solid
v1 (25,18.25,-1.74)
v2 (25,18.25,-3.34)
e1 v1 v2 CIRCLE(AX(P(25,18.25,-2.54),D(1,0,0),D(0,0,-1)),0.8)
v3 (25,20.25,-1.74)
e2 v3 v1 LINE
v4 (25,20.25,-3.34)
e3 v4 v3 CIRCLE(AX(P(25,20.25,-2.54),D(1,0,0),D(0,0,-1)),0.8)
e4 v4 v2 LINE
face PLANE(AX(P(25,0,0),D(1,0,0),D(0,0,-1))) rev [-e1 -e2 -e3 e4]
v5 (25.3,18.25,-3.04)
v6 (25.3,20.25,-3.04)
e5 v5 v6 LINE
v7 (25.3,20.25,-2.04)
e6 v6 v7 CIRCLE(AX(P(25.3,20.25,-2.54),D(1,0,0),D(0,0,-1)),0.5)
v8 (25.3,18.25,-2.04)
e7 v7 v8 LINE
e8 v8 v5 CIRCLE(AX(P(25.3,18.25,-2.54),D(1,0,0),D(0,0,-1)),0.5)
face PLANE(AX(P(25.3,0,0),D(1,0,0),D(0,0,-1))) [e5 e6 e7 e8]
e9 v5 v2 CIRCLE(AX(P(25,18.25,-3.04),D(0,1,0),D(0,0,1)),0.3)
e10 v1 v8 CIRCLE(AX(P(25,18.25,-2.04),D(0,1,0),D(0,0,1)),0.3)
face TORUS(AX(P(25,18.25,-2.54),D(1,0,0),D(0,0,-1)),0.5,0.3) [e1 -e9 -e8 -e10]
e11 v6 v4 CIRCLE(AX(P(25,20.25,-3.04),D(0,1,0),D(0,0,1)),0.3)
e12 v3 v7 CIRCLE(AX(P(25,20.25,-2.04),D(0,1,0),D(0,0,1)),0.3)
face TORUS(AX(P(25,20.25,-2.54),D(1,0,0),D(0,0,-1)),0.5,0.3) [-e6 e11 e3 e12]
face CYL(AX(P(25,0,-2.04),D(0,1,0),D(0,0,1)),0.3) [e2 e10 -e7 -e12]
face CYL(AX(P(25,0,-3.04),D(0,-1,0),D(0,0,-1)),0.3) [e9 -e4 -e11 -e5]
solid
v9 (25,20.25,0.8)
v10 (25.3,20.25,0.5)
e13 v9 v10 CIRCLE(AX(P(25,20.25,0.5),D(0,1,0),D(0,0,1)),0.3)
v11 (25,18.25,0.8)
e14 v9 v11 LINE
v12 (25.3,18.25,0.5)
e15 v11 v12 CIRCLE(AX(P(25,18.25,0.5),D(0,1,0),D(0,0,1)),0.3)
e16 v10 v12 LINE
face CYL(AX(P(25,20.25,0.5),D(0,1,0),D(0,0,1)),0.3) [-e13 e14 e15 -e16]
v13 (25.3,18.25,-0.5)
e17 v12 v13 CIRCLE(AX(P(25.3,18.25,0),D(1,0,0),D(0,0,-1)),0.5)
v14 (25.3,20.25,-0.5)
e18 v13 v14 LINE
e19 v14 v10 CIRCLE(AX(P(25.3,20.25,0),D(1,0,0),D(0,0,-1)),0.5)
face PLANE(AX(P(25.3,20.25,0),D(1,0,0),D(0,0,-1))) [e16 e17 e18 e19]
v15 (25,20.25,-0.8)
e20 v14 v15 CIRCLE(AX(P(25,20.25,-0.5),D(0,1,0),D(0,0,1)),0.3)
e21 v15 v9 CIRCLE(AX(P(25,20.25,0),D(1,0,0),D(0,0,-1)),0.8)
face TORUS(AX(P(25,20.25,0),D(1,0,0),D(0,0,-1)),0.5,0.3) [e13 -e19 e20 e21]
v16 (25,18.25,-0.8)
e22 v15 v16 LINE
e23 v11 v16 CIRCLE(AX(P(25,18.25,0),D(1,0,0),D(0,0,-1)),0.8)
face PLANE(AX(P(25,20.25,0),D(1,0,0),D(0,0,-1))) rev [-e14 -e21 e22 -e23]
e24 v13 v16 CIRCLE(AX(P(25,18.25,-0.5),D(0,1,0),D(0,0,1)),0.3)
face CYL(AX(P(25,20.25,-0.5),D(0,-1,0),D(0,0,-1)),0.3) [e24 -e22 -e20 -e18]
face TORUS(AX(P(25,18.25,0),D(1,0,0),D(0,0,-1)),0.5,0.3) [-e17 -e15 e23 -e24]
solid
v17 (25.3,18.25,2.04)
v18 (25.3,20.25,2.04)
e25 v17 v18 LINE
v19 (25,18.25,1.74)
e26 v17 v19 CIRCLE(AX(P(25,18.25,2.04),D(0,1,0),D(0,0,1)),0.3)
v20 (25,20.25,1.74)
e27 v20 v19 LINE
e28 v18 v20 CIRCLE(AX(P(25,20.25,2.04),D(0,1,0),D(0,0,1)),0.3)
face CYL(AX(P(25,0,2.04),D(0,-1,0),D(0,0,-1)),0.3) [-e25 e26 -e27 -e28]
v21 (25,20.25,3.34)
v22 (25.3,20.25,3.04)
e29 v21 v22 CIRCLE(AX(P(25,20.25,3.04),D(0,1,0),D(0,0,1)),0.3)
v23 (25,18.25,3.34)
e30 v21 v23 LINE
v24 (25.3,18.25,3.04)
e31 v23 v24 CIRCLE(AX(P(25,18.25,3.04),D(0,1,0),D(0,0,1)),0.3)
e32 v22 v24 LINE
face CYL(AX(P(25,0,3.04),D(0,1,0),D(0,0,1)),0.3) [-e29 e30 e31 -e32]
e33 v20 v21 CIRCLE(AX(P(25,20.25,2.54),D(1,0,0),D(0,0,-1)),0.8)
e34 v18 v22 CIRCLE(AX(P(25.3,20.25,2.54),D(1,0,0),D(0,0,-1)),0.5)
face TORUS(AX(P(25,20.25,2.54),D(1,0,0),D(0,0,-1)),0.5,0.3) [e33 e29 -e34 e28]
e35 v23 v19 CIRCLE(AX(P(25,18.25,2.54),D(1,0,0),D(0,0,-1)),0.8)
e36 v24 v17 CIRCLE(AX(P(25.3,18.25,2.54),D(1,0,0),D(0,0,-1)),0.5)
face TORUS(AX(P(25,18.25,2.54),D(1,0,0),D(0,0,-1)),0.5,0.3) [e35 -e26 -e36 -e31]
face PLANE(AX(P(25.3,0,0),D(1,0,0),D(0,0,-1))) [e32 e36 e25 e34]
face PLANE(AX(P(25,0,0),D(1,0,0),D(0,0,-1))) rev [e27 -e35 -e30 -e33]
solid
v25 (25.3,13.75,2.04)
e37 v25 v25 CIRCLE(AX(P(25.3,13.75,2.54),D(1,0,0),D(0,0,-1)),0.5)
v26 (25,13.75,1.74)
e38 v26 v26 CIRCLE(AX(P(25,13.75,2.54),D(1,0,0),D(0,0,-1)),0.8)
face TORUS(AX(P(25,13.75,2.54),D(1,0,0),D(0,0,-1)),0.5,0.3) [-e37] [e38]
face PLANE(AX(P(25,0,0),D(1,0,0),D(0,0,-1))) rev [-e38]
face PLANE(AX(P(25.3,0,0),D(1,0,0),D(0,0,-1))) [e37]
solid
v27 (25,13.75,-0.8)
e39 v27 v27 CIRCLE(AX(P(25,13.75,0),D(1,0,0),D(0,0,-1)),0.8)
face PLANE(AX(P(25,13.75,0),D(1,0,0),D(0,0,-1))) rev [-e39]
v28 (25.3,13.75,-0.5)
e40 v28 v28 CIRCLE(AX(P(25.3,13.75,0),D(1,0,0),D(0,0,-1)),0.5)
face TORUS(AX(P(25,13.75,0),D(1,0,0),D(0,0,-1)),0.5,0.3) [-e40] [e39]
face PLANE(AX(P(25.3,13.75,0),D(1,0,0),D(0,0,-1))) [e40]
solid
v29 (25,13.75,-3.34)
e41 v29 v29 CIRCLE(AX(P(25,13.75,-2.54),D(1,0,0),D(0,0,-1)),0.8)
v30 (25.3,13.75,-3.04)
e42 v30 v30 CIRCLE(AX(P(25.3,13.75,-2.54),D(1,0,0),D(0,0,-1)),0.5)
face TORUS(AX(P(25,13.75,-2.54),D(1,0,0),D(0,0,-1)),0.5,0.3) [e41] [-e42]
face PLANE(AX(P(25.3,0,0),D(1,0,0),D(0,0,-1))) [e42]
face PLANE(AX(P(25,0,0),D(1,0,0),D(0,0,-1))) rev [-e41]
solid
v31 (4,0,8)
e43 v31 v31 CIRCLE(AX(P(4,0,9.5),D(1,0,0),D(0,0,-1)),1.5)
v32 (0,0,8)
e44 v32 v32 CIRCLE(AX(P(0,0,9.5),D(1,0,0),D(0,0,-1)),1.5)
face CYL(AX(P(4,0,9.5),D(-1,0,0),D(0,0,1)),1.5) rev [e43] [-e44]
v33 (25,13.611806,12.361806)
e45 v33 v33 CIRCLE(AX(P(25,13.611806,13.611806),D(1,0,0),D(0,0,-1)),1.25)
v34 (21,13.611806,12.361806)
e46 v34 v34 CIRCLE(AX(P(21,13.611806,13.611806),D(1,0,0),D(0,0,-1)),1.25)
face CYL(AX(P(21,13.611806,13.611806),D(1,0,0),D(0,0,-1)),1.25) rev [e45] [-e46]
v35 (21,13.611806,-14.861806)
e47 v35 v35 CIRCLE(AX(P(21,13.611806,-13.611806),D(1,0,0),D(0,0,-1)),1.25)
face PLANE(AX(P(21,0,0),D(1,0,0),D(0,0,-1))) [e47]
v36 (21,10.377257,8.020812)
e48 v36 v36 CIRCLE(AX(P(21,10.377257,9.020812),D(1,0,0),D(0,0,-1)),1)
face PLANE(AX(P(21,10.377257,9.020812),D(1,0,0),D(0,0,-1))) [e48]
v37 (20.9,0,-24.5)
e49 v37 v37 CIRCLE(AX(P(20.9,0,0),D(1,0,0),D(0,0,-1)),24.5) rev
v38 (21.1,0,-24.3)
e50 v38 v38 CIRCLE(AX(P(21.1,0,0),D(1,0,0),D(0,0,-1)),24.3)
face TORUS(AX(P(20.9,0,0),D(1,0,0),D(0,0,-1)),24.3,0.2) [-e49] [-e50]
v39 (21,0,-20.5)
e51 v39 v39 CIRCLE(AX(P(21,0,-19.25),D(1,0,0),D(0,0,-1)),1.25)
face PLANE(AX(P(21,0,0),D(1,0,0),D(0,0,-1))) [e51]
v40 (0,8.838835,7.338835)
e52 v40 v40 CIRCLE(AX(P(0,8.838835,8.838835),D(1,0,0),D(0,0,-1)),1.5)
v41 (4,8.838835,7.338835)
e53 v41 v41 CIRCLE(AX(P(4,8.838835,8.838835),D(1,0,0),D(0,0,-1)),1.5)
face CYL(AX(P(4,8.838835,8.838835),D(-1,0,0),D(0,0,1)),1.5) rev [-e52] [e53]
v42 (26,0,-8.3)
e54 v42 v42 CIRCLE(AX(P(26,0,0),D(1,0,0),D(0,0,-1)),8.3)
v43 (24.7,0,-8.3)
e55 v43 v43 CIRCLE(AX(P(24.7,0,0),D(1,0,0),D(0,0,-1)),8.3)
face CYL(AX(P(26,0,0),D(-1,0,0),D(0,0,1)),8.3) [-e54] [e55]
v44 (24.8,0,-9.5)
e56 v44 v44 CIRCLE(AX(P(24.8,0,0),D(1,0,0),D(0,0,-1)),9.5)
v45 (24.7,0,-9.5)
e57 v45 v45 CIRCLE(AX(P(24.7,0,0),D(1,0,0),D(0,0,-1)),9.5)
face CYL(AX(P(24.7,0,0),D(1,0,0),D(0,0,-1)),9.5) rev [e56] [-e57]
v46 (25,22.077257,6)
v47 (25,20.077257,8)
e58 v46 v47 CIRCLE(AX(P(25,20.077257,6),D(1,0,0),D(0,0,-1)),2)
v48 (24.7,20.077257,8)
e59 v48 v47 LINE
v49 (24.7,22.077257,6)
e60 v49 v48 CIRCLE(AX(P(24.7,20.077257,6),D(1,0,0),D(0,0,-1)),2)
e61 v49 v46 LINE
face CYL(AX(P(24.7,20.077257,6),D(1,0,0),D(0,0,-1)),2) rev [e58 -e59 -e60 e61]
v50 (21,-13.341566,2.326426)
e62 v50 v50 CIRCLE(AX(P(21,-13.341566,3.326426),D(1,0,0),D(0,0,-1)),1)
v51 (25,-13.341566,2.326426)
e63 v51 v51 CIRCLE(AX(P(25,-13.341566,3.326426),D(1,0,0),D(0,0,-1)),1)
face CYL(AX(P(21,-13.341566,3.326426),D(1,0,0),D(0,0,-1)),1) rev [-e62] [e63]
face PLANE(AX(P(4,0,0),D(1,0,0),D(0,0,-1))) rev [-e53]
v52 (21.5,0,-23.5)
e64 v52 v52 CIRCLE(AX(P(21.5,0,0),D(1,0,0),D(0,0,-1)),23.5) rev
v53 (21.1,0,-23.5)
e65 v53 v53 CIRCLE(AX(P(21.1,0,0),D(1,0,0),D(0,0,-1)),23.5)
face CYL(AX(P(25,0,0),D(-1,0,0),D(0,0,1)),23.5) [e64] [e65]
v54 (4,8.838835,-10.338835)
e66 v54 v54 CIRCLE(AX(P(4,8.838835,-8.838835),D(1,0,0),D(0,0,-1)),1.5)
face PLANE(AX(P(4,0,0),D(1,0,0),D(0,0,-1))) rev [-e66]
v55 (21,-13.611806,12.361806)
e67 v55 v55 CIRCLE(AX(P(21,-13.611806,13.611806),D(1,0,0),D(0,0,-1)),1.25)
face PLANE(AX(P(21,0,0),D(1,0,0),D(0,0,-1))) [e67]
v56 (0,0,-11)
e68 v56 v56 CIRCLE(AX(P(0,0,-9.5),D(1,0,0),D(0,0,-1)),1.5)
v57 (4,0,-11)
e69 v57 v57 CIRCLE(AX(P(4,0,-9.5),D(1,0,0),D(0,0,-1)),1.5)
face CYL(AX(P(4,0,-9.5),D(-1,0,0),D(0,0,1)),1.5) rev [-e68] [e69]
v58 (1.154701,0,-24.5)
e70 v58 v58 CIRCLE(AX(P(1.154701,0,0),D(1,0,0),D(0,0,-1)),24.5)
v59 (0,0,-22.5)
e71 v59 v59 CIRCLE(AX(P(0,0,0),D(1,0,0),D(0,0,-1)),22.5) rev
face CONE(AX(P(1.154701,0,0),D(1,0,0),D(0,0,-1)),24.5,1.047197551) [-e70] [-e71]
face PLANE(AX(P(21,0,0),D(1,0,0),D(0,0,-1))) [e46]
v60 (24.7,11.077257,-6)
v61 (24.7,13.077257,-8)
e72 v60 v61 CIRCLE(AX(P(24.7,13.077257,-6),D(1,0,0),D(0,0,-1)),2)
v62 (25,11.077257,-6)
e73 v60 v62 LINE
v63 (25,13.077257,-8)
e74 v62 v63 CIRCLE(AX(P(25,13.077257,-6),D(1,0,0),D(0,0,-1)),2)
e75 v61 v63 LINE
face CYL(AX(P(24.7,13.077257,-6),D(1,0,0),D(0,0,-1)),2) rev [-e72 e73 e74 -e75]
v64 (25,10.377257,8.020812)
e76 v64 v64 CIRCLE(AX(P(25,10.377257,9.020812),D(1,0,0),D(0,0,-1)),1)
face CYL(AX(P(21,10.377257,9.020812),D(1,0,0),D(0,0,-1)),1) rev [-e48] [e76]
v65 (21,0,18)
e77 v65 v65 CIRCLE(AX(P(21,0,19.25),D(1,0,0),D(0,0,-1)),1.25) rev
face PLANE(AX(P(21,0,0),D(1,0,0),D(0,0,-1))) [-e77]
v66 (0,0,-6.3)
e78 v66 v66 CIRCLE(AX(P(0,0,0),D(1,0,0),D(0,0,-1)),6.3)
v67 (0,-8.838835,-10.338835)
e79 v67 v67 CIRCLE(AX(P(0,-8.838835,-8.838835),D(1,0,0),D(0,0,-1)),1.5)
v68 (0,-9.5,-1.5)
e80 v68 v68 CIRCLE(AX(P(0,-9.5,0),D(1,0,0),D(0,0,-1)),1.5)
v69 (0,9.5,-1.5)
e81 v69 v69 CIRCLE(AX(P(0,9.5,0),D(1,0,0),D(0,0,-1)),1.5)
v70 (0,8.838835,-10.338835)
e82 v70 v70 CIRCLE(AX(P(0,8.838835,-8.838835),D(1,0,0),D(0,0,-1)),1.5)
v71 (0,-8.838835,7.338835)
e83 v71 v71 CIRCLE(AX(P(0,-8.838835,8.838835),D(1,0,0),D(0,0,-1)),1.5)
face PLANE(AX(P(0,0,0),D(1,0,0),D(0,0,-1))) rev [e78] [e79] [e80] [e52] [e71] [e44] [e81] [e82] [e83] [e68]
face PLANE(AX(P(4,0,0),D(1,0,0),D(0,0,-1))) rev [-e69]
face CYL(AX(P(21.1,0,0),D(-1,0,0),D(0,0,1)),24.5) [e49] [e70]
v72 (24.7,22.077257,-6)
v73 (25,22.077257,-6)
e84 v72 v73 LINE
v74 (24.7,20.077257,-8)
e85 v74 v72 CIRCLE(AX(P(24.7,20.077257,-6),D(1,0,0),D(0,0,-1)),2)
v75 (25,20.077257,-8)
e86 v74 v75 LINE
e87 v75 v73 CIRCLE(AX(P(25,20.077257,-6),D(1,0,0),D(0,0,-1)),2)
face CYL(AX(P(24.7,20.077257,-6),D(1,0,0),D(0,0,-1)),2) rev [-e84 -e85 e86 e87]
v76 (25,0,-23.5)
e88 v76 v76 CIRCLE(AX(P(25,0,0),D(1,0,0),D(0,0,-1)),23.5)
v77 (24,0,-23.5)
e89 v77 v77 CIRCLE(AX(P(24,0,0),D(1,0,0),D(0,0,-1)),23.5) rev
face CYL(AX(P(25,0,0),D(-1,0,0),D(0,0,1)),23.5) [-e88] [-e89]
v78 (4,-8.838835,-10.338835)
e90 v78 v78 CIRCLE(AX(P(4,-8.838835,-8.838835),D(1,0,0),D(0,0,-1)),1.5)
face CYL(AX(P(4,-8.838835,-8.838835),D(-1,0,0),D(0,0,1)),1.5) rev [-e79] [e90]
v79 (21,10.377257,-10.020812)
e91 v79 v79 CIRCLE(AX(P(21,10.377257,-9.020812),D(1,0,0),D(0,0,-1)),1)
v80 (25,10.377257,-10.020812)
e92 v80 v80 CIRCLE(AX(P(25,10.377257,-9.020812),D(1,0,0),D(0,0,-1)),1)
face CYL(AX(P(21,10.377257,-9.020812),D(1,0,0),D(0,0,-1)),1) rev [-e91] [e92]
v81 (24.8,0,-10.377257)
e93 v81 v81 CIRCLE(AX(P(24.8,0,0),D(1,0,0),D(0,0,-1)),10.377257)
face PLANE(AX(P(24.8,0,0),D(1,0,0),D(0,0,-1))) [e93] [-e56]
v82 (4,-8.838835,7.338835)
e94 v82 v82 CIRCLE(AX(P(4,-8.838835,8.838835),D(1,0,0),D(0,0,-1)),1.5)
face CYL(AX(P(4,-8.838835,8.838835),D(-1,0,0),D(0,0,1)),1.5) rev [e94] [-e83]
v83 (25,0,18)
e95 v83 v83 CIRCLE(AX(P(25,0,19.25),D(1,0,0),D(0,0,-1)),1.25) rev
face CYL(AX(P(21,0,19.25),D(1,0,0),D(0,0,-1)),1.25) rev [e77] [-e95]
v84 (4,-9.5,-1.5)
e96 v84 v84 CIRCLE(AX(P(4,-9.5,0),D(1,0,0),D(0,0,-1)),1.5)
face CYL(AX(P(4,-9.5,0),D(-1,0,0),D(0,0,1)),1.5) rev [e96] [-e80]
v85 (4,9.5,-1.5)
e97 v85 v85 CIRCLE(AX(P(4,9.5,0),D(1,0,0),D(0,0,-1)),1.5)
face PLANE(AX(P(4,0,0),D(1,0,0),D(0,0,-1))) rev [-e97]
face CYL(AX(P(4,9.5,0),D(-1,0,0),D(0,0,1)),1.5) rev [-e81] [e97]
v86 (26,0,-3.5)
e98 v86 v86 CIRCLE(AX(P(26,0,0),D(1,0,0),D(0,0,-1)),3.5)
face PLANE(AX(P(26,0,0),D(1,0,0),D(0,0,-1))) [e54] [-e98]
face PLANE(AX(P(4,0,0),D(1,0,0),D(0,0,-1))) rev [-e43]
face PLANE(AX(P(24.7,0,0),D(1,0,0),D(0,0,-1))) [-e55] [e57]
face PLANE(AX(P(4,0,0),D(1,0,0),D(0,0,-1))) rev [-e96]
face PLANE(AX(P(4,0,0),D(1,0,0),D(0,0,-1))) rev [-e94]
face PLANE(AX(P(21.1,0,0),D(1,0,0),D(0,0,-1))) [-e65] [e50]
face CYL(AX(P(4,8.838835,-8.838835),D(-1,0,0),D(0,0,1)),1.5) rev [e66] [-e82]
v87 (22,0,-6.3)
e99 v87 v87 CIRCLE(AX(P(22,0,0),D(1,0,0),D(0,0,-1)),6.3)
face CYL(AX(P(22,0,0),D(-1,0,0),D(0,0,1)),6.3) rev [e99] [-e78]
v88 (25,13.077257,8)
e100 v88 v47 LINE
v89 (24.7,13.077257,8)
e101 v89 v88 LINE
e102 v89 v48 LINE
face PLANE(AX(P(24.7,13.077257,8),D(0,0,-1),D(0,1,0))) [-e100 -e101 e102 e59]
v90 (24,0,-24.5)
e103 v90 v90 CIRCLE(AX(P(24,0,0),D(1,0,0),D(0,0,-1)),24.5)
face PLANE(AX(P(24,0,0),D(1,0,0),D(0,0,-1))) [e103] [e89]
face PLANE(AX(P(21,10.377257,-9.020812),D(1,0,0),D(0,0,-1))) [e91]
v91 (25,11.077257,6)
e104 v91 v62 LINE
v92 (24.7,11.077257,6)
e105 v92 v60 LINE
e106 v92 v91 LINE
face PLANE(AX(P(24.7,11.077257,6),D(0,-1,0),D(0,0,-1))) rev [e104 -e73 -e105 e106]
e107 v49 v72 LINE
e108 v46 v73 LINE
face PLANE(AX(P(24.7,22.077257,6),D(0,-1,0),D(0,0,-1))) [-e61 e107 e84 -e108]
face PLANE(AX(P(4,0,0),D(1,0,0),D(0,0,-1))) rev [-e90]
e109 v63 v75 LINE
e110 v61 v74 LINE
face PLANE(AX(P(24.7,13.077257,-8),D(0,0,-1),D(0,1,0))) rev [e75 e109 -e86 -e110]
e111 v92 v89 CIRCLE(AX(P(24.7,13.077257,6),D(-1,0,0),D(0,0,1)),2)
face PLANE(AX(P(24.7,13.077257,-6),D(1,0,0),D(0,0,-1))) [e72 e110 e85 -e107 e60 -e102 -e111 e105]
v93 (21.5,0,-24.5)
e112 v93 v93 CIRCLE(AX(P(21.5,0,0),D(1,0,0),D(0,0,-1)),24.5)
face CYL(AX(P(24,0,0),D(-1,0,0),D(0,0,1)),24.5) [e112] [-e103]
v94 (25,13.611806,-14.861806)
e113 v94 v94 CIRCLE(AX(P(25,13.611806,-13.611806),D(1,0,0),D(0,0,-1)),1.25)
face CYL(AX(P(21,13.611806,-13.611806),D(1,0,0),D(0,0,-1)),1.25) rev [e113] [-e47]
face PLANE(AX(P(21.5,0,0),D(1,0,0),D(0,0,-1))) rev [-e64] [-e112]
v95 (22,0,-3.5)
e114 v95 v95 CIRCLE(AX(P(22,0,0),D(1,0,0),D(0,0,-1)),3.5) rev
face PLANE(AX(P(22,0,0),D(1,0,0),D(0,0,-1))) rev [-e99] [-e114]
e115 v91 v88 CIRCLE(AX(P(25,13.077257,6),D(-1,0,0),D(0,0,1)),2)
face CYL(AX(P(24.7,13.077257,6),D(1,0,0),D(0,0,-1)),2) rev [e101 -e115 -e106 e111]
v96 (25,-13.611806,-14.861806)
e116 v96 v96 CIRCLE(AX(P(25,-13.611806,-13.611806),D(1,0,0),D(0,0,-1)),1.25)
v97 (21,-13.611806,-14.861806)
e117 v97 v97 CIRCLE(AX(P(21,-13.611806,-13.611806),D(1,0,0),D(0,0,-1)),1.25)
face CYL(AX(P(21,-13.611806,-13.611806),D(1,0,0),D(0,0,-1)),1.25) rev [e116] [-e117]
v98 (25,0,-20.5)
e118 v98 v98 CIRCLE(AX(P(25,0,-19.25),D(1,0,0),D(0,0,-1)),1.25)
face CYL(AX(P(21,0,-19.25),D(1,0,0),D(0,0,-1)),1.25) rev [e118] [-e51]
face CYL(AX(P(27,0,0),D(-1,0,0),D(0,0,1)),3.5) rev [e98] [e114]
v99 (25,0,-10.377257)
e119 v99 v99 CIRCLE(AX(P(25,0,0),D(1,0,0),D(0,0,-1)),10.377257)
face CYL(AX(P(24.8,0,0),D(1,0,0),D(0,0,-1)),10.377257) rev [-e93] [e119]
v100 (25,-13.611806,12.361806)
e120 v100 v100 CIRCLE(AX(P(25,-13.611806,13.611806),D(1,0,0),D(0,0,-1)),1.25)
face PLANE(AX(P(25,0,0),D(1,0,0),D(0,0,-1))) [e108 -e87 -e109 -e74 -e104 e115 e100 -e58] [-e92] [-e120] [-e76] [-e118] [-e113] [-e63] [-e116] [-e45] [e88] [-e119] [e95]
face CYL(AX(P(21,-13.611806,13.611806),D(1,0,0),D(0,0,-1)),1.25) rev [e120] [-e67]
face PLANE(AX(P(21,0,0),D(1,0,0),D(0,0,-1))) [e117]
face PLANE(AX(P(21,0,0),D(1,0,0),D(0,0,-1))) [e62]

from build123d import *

# Parameters (mm, degrees)
SKETCH_2_R           = 24.5
EXTRUDE_1_DEPTH      = 24
SKETCH_2_17_R        = 24.5
CUT_EXTRUDE_18_DEPTH = 21.5
SKETCH_2_18_R        = 24.5
EXTRUDE_7_DEPTH      = 21.1
SKETCH_2_5_R         = 23.5
EXTRUDE_2_DEPTH      = 25
SKETCH_2_14_R        = 1.5
CUT_EXTRUDE_12_DEPTH = 4
CHAMFER_1_SIZE       = 2
CHAMFER_1_SIZE2      = 1.154700538
SKETCH_2_15_R        = 6.3
SKETCH_2_15_R_2      = 3.5
CUT_EXTRUDE_13_DEPTH = 22
SKETCH_2_16_R        = 3.5
CUT_EXTRUDE_16_DEPTH = 27
SKETCH_3_R           = 8.3
SKETCH_3_R_2         = 3.5
EXTRUDE_6_DEPTH      = 1
SKETCH_3_7_R         = 1.25
SKETCH_3_7_R_2       = 1
CUT_EXTRUDE_17_DEPTH = 4
CUT_EXTRUDE_START    = -0.3
SKETCH_3_8_R         = 9.5
SKETCH_3_8_R_2       = 8.3
CUT_EXTRUDE_19_DEPTH = 0.3
CUT_EXTRUDE_START_2  = -0.2
SKETCH_3_9_R         = 10.377256728
SKETCH_3_9_R_2       = 9.5
CUT_EXTRUDE_20_DEPTH = 0.2
CUT_EXTRUDE_21_DEPTH = 0.3
EXTRUDE_8_DEPTH      = 0.3
EXTRUDE_8_2_DEPTH    = 0.3
EXTRUDE_8_3_DEPTH    = 0.3
FILLET_1_R           = 0.3
FILLET_2_R           = 0.3
FILLET_3_R           = 0.3
SKETCH_3_13_R        = 0.8
EXTRUDE_9_DEPTH      = 0.3
EXTRUDE_9_2_DEPTH    = 0.3
EXTRUDE_9_3_DEPTH    = 0.3
FILLET_4_R           = 0.3
FILLET_5_R           = 0.3
FILLET_6_R           = 0.3
FILLET_7_R           = 0.2


# Some blends are built 0.0001 mm under size
with BuildPart() as part:
    # 草图2 → 凸台-拉伸1 (new body)
    with BuildSketch(Plane(origin=(0, 0, 0), x_dir=(0, 0, -1), z_dir=(1, 0, 0))):
        Circle(SKETCH_2_R)
    extrude(amount=EXTRUDE_1_DEPTH)

    # 草图2<17> → 切除-拉伸18 (cut)
    with BuildSketch(Plane(origin=(0, 0, 0), x_dir=(0, 0, -1), z_dir=(1, 0, 0))):
        Circle(SKETCH_2_17_R)
    extrude(amount=CUT_EXTRUDE_18_DEPTH, mode=Mode.SUBTRACT)



with BuildPart() as body_2:
    # 草图2<18> → 凸台-拉伸7 (new body)
    with BuildSketch(Plane(origin=(0, 0, 0), x_dir=(0, 0, -1), z_dir=(1, 0, 0))):
        Circle(SKETCH_2_18_R)
    extrude(amount=EXTRUDE_7_DEPTH)


with BuildPart() as part_1:
    add(part.part)

    add(body_2.part)  # 凸台-拉伸2 merges body 2
    # 草图2<5> → 凸台-拉伸2 (add)
    with BuildSketch(Plane(origin=(0, 0, 0), x_dir=(0, 0, -1), z_dir=(1, 0, 0))):
        Circle(SKETCH_2_5_R)
    extrude(amount=EXTRUDE_2_DEPTH)

    # 草图2<14> → 切除-拉伸12 (cut)
    with BuildSketch(Plane(origin=(0, 0, 0), x_dir=(0, 0, -1), z_dir=(1, 0, 0))):
        with Locations((0, 9.5)):
            Circle(SKETCH_2_14_R)
        with Locations((9.5, 0)):
            Circle(SKETCH_2_14_R)
        with Locations((0, -9.5)):
            Circle(SKETCH_2_14_R)
        with Locations((-9.5, 0)):
            Circle(SKETCH_2_14_R)
        with Locations((8.838834765, 8.838834765)):
            Circle(SKETCH_2_14_R)
        with Locations((8.838834765, -8.838834765)):
            Circle(SKETCH_2_14_R)
        with Locations((-8.838834765, -8.838834765)):
            Circle(SKETCH_2_14_R)
        with Locations((-8.838834765, 8.838834765)):
            Circle(SKETCH_2_14_R)
    extrude(amount=CUT_EXTRUDE_12_DEPTH, mode=Mode.SUBTRACT)

    # 倒角1
    chamfer_1_edges = [part_1.edges().sort_by_distance(p)[0] for p in [
        (0, 0, 24.5),
    ]]
    chamfer_1_side = [part_1.faces().sort_by_distance(p)[0] for p in [
        (0, 0, 0),
    ]]
    chamfer(chamfer_1_edges, length=CHAMFER_1_SIZE, length2=CHAMFER_1_SIZE2, reference=chamfer_1_side[0])

    # 草图2<15> → 切除-拉伸13 (cut)
    with BuildSketch(Plane(origin=(0, 0, 0), x_dir=(0, 0, -1), z_dir=(1, 0, 0))):
        Circle(SKETCH_2_15_R)
        Circle(SKETCH_2_15_R_2, mode=Mode.SUBTRACT)
    extrude(amount=CUT_EXTRUDE_13_DEPTH, mode=Mode.SUBTRACT)

    # 草图2<16> → 切除-拉伸16 (cut)
    with BuildSketch(Plane(origin=(0, 0, 0), x_dir=(0, 0, -1), z_dir=(1, 0, 0))):
        Circle(SKETCH_2_16_R)
    extrude(amount=CUT_EXTRUDE_16_DEPTH, mode=Mode.SUBTRACT)

    # 草图3 → 凸台-拉伸6 (add)
    with BuildSketch(Plane(origin=(25, 0, 0), x_dir=(0, 0, -1), z_dir=(1, 0, 0))):
        Circle(SKETCH_3_R)
        Circle(SKETCH_3_R_2, mode=Mode.SUBTRACT)
    extrude(amount=EXTRUDE_6_DEPTH)

    # 草图3<7> → 切除-拉伸17 (cut)
    with BuildSketch(Plane(origin=(25, 0, 0), x_dir=(0, 0, -1), z_dir=(1, 0, 0))):
        with Locations((13.611805538, 13.611805538)):
            Circle(SKETCH_3_7_R)
        with Locations((13.611805538, -13.611805538)):
            Circle(SKETCH_3_7_R)
        with Locations((-3.326426064, -13.341566236)):
            Circle(SKETCH_3_7_R_2)
        with Locations((-13.611805538, -13.611805538)):
            Circle(SKETCH_3_7_R)
        with Locations((-13.611805538, 13.611805538)):
            Circle(SKETCH_3_7_R)
        with Locations((-19.25, 0)):
            Circle(SKETCH_3_7_R)
        with Locations((19.25, 0)):
            Circle(SKETCH_3_7_R)
        with Locations((9.020811649, 10.377256728)):
            Circle(SKETCH_3_7_R_2)
        with Locations((-9.020811649, 10.377256728)):
            Circle(SKETCH_3_7_R_2)
    extrude(amount=-CUT_EXTRUDE_17_DEPTH, mode=Mode.SUBTRACT)

    # 草图3<8> → 切除-拉伸19 (cut)
    with BuildSketch(Plane(origin=(25, 0, 0), x_dir=(0, 0, -1), z_dir=(1, 0, 0)).offset(CUT_EXTRUDE_START)):
        Circle(SKETCH_3_8_R)
        Circle(SKETCH_3_8_R_2, mode=Mode.SUBTRACT)
    extrude(amount=CUT_EXTRUDE_19_DEPTH, mode=Mode.SUBTRACT)

    # 草图3<9> → 切除-拉伸20 (cut)
    with BuildSketch(Plane(origin=(25, 0, 0), x_dir=(0, 0, -1), z_dir=(1, 0, 0)).offset(CUT_EXTRUDE_START_2)):
        Circle(SKETCH_3_9_R)
        Circle(SKETCH_3_9_R_2, mode=Mode.SUBTRACT)
    extrude(amount=CUT_EXTRUDE_20_DEPTH, mode=Mode.SUBTRACT)

    # 草图3<10> → 切除-拉伸21 (cut)
    with BuildSketch(Plane(origin=(25, 0, 0), x_dir=(0, 0, -1), z_dir=(1, 0, 0))):
        with BuildLine():
            Line((-6, 11.077256728), (6, 11.077256728))
            ThreePointArc((6, 11.077256728), (7.414213562, 11.663043166), (8, 13.077256728))
            Line((8, 13.077256728), (8, 20.077256728))
            ThreePointArc((8, 20.077256728), (7.414213562, 21.49147029), (6, 22.077256728))
            Line((6, 22.077256728), (-6, 22.077256728))
            ThreePointArc((-6, 22.077256728), (-7.414213562, 21.49147029), (-8, 20.077256728))
            Line((-8, 20.077256728), (-8, 13.077256728))
            ThreePointArc((-8, 13.077256728), (-7.414213562, 11.663043166), (-6, 11.077256728))
        make_face()
    extrude(amount=-CUT_EXTRUDE_21_DEPTH, mode=Mode.SUBTRACT)

    # 圆角7
    fillet_7_edges = [part_1.edges().sort_by_distance(p)[0] for p in [
        (21.1, 0, 24.5),
    ]]
    fillet(fillet_7_edges, radius=FILLET_7_R)


with BuildPart() as body_2_2:
    # 草图3<12> → 凸台-拉伸8 (new body)
    with BuildSketch(Plane(origin=(25, 0, 0), x_dir=(0, 0, -1), z_dir=(1, 0, 0))):
        with BuildLine():
            Line((-3.34, 20.25), (-3.34, 18.25))
            ThreePointArc((-3.34, 18.25), (-2.54, 17.45), (-1.74, 18.25))
            Line((-1.74, 18.25), (-1.74, 20.25))
            ThreePointArc((-1.74, 20.25), (-2.54, 21.05), (-3.34, 20.25))
        make_face()
    extrude(amount=EXTRUDE_8_DEPTH)

    # 圆角1
    fillet_1_edges = [body_2_2.edges().sort_by_distance(p)[0] for p in [
        (25.3, 21.05, 2.54),
        (25.3, 19.25, 3.34),
        (25.3, 17.45, 2.54),
        (25.3, 19.25, 1.74),
    ]]
    fillet(fillet_1_edges, radius=FILLET_1_R - 0.0001)  # a hair under: the kernel refuses the full size


with BuildPart() as body_3:
    # 草图3<12> → Extrude 8 2 (new body)
    with BuildSketch(Plane(origin=(25, 0, 0), x_dir=(0, 0, -1), z_dir=(1, 0, 0))):
        with BuildLine():
            Line((1.74, 20.25), (1.74, 18.25))
            ThreePointArc((1.74, 18.25), (2.54, 17.45), (3.34, 18.25))
            Line((3.34, 18.25), (3.34, 20.25))
            ThreePointArc((3.34, 20.25), (2.54, 21.05), (1.74, 20.25))
        make_face()
    extrude(amount=EXTRUDE_8_2_DEPTH)

    # 圆角3
    fillet_3_edges = [body_3.edges().sort_by_distance(p)[0] for p in [
        (25.3, 21.05, -2.54),
        (25.3, 19.25, -1.74),
        (25.3, 17.45, -2.54),
        (25.3, 19.25, -3.34),
    ]]
    fillet(fillet_3_edges, radius=FILLET_3_R - 0.0001)  # a hair under: the kernel refuses the full size


with BuildPart() as body_4:
    # 草图3<12> → Extrude 8 3 (new body)
    with BuildSketch(Plane(origin=(25, 0, 0), x_dir=(0, 0, -1), z_dir=(1, 0, 0))):
        with BuildLine():
            Line((0.8, 20.25), (0.8, 18.25))
            ThreePointArc((0.8, 18.25), (0, 17.45), (-0.8, 18.25))
            Line((-0.8, 18.25), (-0.8, 20.25))
            ThreePointArc((-0.8, 20.25), (0, 21.05), (0.8, 20.25))
        make_face()
    extrude(amount=EXTRUDE_8_3_DEPTH)

    # 圆角2
    fillet_2_edges = [body_4.edges().sort_by_distance(p)[0] for p in [
        (25.3, 21.05, 0),
        (25.3, 19.25, 0.8),
        (25.3, 17.45, 0),
        (25.3, 19.25, -0.8),
    ]]
    fillet(fillet_2_edges, radius=FILLET_2_R - 0.0001)  # a hair under: the kernel refuses the full size


with BuildPart() as body_5:
    # 草图3<13> → 凸台-拉伸9 (new body)
    with BuildSketch(Plane(origin=(25, 0, 0), x_dir=(0, 0, -1), z_dir=(1, 0, 0))):
        with Locations((2.54, 13.75)):
            Circle(SKETCH_3_13_R)
    extrude(amount=EXTRUDE_9_DEPTH)

    # 圆角6
    # the kernel refuses this fillet: 0.3 mm, written as the material it takes off along each edge
    with BuildSketch(Plane(origin=(25.3, 13.75, -2.54), x_dir=(0, 0, -1), z_dir=(0, -1, 0))) as fillet_6_piece_1:
        with BuildLine():
            CenterArc((0.8 - FILLET_6_R, -FILLET_6_R), FILLET_6_R, 0, 90)
            Line((0.8 - FILLET_6_R, 0), (0.8, 0))
            Line((0.8, 0), (0.8, -FILLET_6_R))
        make_face()
    revolve(axis=Axis((25.3, 13.75, -2.54), (1, 0, 0)), mode=Mode.SUBTRACT)


with BuildPart() as body_6:
    # 草图3<13> → Extrude 9 2 (new body)
    with BuildSketch(Plane(origin=(25, 0, 0), x_dir=(0, 0, -1), z_dir=(1, 0, 0))):
        with Locations((-2.54, 13.75)):
            Circle(SKETCH_3_13_R)
    extrude(amount=EXTRUDE_9_2_DEPTH)

    # 圆角4
    # the kernel refuses this fillet: 0.3 mm, written as the material it takes off along each edge
    with BuildSketch(Plane(origin=(25.3, 13.75, 2.54), x_dir=(0, 0, -1), z_dir=(0, -1, 0))) as fillet_4_piece_1:
        with BuildLine():
            CenterArc((0.8 - FILLET_4_R, -FILLET_4_R), FILLET_4_R, 0, 90)
            Line((0.8 - FILLET_4_R, 0), (0.8, 0))
            Line((0.8, 0), (0.8, -FILLET_4_R))
        make_face()
    revolve(axis=Axis((25.3, 13.75, 2.54), (1, 0, 0)), mode=Mode.SUBTRACT)


with BuildPart() as body_7:
    # 草图3<13> → Extrude 9 3 (new body)
    with BuildSketch(Plane(origin=(25, 0, 0), x_dir=(0, 0, -1), z_dir=(1, 0, 0))):
        with Locations((0, 13.75)):
            Circle(SKETCH_3_13_R)
    extrude(amount=EXTRUDE_9_3_DEPTH)

    # 圆角5
    # the kernel refuses this fillet: 0.3 mm, written as the material it takes off along each edge
    with BuildSketch(Plane(origin=(25.3, 13.75, 0), x_dir=(0, 0, -1), z_dir=(0, -1, 0))) as fillet_5_piece_1:
        with BuildLine():
            CenterArc((0.8 - FILLET_5_R, -FILLET_5_R), FILLET_5_R, 0, 90)
            Line((0.8 - FILLET_5_R, 0), (0.8, 0))
            Line((0.8, 0), (0.8, -FILLET_5_R))
        make_face()
    revolve(axis=Axis((25.3, 13.75, 0), (1, 0, 0)), mode=Mode.SUBTRACT)


solid = Compound([part_1.part, body_2_2.part, body_3.part, body_4.part, body_5.part, body_6.part, body_7.part])
